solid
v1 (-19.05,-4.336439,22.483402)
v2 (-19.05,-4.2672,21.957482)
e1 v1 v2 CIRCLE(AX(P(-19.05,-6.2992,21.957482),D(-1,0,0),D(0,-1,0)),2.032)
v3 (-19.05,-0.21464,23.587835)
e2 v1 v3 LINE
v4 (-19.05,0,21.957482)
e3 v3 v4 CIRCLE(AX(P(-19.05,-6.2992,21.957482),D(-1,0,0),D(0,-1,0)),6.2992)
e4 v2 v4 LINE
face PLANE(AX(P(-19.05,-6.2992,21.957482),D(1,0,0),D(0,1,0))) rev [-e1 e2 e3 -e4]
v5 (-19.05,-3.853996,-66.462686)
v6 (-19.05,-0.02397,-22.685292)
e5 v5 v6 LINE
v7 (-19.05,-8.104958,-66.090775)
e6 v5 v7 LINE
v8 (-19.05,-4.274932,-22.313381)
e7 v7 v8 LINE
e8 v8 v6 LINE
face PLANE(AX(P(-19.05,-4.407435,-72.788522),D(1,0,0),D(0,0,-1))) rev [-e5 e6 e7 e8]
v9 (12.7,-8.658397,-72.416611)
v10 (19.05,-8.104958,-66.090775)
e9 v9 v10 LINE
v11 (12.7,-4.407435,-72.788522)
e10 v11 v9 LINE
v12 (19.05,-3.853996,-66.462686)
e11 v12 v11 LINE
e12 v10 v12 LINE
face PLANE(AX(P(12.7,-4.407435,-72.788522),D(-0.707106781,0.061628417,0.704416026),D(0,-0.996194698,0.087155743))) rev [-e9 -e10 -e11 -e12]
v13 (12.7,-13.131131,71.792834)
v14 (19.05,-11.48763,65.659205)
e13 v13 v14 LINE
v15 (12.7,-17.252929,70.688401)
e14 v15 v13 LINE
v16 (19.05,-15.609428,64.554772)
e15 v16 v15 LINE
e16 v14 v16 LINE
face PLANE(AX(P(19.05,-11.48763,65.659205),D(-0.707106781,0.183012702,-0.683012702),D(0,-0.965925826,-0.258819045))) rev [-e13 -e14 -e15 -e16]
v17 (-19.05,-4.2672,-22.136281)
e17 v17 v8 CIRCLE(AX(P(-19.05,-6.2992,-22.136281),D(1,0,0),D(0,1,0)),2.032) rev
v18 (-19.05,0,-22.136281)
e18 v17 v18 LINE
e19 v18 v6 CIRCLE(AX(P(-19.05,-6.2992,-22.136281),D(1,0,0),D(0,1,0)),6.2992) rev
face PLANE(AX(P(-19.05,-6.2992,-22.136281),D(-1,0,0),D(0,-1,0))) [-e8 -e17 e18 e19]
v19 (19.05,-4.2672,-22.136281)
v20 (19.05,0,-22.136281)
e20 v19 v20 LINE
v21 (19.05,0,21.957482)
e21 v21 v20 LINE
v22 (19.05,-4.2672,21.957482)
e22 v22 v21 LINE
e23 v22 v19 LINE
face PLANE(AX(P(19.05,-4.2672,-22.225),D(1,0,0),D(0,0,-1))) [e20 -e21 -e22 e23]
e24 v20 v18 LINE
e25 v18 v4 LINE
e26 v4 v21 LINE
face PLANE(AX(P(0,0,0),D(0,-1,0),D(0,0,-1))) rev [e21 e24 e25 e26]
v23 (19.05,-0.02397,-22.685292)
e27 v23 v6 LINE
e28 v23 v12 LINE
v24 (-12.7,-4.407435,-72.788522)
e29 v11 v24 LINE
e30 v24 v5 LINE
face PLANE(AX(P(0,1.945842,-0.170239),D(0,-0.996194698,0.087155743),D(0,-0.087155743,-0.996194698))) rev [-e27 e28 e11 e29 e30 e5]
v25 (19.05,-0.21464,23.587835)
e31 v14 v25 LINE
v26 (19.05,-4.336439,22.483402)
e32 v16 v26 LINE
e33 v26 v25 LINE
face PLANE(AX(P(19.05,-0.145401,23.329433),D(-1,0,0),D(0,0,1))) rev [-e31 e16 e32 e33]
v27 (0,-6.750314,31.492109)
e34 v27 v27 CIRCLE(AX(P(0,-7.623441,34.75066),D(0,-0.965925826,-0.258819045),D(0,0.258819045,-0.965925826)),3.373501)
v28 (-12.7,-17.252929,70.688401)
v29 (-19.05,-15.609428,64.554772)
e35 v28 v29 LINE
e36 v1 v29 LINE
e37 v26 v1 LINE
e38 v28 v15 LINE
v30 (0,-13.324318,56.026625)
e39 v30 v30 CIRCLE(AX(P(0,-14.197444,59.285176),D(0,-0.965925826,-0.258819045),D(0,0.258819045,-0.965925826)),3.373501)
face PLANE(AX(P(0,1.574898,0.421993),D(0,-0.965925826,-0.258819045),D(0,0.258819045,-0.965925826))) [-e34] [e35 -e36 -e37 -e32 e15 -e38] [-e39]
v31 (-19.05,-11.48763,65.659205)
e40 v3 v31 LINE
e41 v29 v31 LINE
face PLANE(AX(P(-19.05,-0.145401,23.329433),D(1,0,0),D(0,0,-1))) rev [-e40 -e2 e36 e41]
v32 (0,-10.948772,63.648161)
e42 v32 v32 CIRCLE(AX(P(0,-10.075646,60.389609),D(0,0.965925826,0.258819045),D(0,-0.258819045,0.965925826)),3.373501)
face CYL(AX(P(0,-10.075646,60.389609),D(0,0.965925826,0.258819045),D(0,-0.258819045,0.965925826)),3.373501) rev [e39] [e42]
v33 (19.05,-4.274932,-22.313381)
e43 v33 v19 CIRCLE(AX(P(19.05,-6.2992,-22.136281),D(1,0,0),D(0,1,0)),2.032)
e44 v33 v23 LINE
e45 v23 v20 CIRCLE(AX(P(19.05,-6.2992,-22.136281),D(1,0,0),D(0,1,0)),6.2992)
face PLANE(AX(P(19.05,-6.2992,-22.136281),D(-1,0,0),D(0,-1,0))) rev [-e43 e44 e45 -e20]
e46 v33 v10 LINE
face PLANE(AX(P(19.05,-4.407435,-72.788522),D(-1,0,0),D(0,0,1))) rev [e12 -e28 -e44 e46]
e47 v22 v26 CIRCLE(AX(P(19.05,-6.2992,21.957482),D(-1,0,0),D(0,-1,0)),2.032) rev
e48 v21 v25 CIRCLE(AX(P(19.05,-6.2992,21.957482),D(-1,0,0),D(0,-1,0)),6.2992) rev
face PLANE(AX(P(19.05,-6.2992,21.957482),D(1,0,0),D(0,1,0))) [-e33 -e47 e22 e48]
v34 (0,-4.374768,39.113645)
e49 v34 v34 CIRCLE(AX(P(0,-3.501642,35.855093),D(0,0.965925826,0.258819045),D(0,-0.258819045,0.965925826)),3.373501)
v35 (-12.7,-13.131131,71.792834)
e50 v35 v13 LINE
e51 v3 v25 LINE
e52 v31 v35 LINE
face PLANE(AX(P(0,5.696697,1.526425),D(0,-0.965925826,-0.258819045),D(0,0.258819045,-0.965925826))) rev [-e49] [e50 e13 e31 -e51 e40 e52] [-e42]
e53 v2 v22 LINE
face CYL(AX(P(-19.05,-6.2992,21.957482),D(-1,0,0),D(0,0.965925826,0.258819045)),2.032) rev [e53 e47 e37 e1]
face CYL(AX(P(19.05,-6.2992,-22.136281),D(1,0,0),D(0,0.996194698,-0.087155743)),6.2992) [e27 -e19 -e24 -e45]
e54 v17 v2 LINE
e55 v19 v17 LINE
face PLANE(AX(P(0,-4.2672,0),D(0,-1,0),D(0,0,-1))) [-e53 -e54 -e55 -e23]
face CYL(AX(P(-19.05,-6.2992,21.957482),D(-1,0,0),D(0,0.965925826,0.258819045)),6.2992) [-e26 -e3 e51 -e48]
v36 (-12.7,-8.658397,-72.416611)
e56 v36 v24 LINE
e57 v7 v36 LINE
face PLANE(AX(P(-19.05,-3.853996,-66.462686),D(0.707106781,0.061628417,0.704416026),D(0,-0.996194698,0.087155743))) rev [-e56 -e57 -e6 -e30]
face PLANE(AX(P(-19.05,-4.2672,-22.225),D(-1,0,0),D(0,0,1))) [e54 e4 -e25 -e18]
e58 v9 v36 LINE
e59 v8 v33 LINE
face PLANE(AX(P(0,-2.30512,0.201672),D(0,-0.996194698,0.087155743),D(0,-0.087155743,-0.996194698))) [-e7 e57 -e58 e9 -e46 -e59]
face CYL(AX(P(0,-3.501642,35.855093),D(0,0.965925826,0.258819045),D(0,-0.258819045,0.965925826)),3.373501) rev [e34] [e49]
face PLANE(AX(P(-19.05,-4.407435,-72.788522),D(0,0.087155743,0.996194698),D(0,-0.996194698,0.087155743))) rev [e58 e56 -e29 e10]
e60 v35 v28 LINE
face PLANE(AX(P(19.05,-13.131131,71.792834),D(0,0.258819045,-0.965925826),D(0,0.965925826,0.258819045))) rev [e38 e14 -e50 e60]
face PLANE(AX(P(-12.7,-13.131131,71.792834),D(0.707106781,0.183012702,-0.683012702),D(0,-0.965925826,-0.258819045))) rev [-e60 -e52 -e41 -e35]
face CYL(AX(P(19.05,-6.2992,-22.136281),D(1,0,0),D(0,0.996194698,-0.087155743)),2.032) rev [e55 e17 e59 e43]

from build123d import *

# Parameters (mm, degrees)
SKETCH1_W                        = 38.1
SKETCH1_H                        = 44.45
BASE_FLANGE1_DEPTH               = 4.2672
EDGE_FLANGE1_STRIP_CUT_DEPTH     = 38.1
EDGE_FLANGE1_DEPTH               = 38.1
EDGE_FLANGE2_STRIP_CUT_DEPTH     = 38.1
EDGE_FLANGE2_DEPTH               = 38.1
CHAMFER1_SIZE                    = 6.35
F_17_64_0_26563_DIAMETER_HOLE1_D = 6.747002


# Sheet-metal steps are written as plain solids
with BuildPart() as part:
    # Sketch1 → Base-Flange1 (new body)
    with BuildSketch(Plane(origin=(0, 0, 0), x_dir=(1, 0, 0), z_dir=(0, 1, 0))):
        Rectangle(SKETCH1_W, SKETCH1_H)
    extrude(amount=-BASE_FLANGE1_DEPTH)

    # Edge-Flange1 strip (across the edge) → Edge-Flange1 strip cut (cut)
    with BuildSketch(Plane(origin=(19.05, -4.2672, 22.225), x_dir=(0, -0.96592582628907, -0.2588190451025146), z_dir=(-1, 0, 0))):
        Polygon((-9.522131081, 19.049882248), (-4.052559965, -1.362835054), (0.069238721, -0.258402425), (-5.400332395, 20.154314877), align=None)
    extrude(amount=EDGE_FLANGE1_STRIP_CUT_DEPTH, mode=Mode.SUBTRACT)

    # Edge-Flange1 section (across the edge) → Edge-Flange1 (add)
    with BuildSketch(Plane(origin=(19.05, -4.2672, 22.225), x_dir=(0, -0.96592582628907, -0.2588190451025146), z_dir=(-1, 0, 0))):
        with BuildLine():
            Line((-4.2672, 0.267517875), (-4.2672, 50.17300498))
            Line((-4.2672, 50.17300498), (0, 50.17300498))
            Line((0, 50.17300498), (0, 0.267517875))
            ThreePointArc((0, 0.267517875), (0.017384042, 0.002288653), (0.069238721, -0.258402425))
            Line((0.069238721, -0.258402425), (-4.052559965, -1.362835054))
            ThreePointArc((-4.052559965, -1.362835054), (-4.213309471, -0.554692715), (-4.2672, 0.267517875))
        make_face()
    extrude(amount=EDGE_FLANGE1_DEPTH)

    # Edge-Flange2 strip (across the edge) → Edge-Flange2 strip cut (cut)
    with BuildSketch(Plane(origin=(-19.05, -4.2672, -22.225), x_dir=(0, -0.9961946980917461, 0.08715574274765156), z_dir=(1, 0, 0))):
        Polygon((-6.085074523, 20.592090897), (-4.243229642, -0.460292419), (0.007732373, -0.088381433), (-1.834112507, 20.964001883), align=None)
    extrude(amount=EDGE_FLANGE2_STRIP_CUT_DEPTH, mode=Mode.SUBTRACT)

    # Edge-Flange2 section (across the edge) → Edge-Flange2 (add)
    with BuildSketch(Plane(origin=(-19.05, -4.2672, -22.225), x_dir=(0, -0.9961946980917461, 0.08715574274765156), z_dir=(1, 0, 0))):
        with BuildLine():
            Line((-4.2672, 0.088719036), (-4.2672, 50.38333524))
            Line((-4.2672, 50.38333524), (0, 50.38333524))
            Line((0, 50.38333524), (0, 0.088719036))
            ThreePointArc((0, 0.088719036), (0.001934014, 8.4441e-05), (0.007732373, -0.088381433))
            Line((0.007732373, -0.088381433), (-4.243229642, -0.460292419))
            ThreePointArc((-4.243229642, -0.460292419), (-4.261204557, -0.186048209), (-4.2672, 0.088719036))
        make_face()
    extrude(amount=EDGE_FLANGE2_DEPTH)

    # Chamfer1
    chamfer1_edges = [part.edges().sort_by_distance(p)[0] for p in [
        (19.05, -15.192029896, 71.240617608),
        (-19.05, -15.192029896, 71.240617608),
        (-19.05, -6.532915997, -72.602566931),
        (19.05, -6.532915997, -72.602566931),
    ]]
    chamfer(chamfer1_edges, length=CHAMFER1_SIZE)

    # 17/64 (0.26563) Diameter Hole1 (through all)
    with Locations(Plane(origin=(0, 5.696696884, 1.52642533), x_dir=(1, 0, 0), z_dir=(0, 0.9659258262890699, 0.25881904510251463))):
        with Locations((0, -35.539651994), (0, -60.939651994)):
            Hole(F_17_64_0_26563_DIAMETER_HOLE1_D / 2)


solid = part.part
